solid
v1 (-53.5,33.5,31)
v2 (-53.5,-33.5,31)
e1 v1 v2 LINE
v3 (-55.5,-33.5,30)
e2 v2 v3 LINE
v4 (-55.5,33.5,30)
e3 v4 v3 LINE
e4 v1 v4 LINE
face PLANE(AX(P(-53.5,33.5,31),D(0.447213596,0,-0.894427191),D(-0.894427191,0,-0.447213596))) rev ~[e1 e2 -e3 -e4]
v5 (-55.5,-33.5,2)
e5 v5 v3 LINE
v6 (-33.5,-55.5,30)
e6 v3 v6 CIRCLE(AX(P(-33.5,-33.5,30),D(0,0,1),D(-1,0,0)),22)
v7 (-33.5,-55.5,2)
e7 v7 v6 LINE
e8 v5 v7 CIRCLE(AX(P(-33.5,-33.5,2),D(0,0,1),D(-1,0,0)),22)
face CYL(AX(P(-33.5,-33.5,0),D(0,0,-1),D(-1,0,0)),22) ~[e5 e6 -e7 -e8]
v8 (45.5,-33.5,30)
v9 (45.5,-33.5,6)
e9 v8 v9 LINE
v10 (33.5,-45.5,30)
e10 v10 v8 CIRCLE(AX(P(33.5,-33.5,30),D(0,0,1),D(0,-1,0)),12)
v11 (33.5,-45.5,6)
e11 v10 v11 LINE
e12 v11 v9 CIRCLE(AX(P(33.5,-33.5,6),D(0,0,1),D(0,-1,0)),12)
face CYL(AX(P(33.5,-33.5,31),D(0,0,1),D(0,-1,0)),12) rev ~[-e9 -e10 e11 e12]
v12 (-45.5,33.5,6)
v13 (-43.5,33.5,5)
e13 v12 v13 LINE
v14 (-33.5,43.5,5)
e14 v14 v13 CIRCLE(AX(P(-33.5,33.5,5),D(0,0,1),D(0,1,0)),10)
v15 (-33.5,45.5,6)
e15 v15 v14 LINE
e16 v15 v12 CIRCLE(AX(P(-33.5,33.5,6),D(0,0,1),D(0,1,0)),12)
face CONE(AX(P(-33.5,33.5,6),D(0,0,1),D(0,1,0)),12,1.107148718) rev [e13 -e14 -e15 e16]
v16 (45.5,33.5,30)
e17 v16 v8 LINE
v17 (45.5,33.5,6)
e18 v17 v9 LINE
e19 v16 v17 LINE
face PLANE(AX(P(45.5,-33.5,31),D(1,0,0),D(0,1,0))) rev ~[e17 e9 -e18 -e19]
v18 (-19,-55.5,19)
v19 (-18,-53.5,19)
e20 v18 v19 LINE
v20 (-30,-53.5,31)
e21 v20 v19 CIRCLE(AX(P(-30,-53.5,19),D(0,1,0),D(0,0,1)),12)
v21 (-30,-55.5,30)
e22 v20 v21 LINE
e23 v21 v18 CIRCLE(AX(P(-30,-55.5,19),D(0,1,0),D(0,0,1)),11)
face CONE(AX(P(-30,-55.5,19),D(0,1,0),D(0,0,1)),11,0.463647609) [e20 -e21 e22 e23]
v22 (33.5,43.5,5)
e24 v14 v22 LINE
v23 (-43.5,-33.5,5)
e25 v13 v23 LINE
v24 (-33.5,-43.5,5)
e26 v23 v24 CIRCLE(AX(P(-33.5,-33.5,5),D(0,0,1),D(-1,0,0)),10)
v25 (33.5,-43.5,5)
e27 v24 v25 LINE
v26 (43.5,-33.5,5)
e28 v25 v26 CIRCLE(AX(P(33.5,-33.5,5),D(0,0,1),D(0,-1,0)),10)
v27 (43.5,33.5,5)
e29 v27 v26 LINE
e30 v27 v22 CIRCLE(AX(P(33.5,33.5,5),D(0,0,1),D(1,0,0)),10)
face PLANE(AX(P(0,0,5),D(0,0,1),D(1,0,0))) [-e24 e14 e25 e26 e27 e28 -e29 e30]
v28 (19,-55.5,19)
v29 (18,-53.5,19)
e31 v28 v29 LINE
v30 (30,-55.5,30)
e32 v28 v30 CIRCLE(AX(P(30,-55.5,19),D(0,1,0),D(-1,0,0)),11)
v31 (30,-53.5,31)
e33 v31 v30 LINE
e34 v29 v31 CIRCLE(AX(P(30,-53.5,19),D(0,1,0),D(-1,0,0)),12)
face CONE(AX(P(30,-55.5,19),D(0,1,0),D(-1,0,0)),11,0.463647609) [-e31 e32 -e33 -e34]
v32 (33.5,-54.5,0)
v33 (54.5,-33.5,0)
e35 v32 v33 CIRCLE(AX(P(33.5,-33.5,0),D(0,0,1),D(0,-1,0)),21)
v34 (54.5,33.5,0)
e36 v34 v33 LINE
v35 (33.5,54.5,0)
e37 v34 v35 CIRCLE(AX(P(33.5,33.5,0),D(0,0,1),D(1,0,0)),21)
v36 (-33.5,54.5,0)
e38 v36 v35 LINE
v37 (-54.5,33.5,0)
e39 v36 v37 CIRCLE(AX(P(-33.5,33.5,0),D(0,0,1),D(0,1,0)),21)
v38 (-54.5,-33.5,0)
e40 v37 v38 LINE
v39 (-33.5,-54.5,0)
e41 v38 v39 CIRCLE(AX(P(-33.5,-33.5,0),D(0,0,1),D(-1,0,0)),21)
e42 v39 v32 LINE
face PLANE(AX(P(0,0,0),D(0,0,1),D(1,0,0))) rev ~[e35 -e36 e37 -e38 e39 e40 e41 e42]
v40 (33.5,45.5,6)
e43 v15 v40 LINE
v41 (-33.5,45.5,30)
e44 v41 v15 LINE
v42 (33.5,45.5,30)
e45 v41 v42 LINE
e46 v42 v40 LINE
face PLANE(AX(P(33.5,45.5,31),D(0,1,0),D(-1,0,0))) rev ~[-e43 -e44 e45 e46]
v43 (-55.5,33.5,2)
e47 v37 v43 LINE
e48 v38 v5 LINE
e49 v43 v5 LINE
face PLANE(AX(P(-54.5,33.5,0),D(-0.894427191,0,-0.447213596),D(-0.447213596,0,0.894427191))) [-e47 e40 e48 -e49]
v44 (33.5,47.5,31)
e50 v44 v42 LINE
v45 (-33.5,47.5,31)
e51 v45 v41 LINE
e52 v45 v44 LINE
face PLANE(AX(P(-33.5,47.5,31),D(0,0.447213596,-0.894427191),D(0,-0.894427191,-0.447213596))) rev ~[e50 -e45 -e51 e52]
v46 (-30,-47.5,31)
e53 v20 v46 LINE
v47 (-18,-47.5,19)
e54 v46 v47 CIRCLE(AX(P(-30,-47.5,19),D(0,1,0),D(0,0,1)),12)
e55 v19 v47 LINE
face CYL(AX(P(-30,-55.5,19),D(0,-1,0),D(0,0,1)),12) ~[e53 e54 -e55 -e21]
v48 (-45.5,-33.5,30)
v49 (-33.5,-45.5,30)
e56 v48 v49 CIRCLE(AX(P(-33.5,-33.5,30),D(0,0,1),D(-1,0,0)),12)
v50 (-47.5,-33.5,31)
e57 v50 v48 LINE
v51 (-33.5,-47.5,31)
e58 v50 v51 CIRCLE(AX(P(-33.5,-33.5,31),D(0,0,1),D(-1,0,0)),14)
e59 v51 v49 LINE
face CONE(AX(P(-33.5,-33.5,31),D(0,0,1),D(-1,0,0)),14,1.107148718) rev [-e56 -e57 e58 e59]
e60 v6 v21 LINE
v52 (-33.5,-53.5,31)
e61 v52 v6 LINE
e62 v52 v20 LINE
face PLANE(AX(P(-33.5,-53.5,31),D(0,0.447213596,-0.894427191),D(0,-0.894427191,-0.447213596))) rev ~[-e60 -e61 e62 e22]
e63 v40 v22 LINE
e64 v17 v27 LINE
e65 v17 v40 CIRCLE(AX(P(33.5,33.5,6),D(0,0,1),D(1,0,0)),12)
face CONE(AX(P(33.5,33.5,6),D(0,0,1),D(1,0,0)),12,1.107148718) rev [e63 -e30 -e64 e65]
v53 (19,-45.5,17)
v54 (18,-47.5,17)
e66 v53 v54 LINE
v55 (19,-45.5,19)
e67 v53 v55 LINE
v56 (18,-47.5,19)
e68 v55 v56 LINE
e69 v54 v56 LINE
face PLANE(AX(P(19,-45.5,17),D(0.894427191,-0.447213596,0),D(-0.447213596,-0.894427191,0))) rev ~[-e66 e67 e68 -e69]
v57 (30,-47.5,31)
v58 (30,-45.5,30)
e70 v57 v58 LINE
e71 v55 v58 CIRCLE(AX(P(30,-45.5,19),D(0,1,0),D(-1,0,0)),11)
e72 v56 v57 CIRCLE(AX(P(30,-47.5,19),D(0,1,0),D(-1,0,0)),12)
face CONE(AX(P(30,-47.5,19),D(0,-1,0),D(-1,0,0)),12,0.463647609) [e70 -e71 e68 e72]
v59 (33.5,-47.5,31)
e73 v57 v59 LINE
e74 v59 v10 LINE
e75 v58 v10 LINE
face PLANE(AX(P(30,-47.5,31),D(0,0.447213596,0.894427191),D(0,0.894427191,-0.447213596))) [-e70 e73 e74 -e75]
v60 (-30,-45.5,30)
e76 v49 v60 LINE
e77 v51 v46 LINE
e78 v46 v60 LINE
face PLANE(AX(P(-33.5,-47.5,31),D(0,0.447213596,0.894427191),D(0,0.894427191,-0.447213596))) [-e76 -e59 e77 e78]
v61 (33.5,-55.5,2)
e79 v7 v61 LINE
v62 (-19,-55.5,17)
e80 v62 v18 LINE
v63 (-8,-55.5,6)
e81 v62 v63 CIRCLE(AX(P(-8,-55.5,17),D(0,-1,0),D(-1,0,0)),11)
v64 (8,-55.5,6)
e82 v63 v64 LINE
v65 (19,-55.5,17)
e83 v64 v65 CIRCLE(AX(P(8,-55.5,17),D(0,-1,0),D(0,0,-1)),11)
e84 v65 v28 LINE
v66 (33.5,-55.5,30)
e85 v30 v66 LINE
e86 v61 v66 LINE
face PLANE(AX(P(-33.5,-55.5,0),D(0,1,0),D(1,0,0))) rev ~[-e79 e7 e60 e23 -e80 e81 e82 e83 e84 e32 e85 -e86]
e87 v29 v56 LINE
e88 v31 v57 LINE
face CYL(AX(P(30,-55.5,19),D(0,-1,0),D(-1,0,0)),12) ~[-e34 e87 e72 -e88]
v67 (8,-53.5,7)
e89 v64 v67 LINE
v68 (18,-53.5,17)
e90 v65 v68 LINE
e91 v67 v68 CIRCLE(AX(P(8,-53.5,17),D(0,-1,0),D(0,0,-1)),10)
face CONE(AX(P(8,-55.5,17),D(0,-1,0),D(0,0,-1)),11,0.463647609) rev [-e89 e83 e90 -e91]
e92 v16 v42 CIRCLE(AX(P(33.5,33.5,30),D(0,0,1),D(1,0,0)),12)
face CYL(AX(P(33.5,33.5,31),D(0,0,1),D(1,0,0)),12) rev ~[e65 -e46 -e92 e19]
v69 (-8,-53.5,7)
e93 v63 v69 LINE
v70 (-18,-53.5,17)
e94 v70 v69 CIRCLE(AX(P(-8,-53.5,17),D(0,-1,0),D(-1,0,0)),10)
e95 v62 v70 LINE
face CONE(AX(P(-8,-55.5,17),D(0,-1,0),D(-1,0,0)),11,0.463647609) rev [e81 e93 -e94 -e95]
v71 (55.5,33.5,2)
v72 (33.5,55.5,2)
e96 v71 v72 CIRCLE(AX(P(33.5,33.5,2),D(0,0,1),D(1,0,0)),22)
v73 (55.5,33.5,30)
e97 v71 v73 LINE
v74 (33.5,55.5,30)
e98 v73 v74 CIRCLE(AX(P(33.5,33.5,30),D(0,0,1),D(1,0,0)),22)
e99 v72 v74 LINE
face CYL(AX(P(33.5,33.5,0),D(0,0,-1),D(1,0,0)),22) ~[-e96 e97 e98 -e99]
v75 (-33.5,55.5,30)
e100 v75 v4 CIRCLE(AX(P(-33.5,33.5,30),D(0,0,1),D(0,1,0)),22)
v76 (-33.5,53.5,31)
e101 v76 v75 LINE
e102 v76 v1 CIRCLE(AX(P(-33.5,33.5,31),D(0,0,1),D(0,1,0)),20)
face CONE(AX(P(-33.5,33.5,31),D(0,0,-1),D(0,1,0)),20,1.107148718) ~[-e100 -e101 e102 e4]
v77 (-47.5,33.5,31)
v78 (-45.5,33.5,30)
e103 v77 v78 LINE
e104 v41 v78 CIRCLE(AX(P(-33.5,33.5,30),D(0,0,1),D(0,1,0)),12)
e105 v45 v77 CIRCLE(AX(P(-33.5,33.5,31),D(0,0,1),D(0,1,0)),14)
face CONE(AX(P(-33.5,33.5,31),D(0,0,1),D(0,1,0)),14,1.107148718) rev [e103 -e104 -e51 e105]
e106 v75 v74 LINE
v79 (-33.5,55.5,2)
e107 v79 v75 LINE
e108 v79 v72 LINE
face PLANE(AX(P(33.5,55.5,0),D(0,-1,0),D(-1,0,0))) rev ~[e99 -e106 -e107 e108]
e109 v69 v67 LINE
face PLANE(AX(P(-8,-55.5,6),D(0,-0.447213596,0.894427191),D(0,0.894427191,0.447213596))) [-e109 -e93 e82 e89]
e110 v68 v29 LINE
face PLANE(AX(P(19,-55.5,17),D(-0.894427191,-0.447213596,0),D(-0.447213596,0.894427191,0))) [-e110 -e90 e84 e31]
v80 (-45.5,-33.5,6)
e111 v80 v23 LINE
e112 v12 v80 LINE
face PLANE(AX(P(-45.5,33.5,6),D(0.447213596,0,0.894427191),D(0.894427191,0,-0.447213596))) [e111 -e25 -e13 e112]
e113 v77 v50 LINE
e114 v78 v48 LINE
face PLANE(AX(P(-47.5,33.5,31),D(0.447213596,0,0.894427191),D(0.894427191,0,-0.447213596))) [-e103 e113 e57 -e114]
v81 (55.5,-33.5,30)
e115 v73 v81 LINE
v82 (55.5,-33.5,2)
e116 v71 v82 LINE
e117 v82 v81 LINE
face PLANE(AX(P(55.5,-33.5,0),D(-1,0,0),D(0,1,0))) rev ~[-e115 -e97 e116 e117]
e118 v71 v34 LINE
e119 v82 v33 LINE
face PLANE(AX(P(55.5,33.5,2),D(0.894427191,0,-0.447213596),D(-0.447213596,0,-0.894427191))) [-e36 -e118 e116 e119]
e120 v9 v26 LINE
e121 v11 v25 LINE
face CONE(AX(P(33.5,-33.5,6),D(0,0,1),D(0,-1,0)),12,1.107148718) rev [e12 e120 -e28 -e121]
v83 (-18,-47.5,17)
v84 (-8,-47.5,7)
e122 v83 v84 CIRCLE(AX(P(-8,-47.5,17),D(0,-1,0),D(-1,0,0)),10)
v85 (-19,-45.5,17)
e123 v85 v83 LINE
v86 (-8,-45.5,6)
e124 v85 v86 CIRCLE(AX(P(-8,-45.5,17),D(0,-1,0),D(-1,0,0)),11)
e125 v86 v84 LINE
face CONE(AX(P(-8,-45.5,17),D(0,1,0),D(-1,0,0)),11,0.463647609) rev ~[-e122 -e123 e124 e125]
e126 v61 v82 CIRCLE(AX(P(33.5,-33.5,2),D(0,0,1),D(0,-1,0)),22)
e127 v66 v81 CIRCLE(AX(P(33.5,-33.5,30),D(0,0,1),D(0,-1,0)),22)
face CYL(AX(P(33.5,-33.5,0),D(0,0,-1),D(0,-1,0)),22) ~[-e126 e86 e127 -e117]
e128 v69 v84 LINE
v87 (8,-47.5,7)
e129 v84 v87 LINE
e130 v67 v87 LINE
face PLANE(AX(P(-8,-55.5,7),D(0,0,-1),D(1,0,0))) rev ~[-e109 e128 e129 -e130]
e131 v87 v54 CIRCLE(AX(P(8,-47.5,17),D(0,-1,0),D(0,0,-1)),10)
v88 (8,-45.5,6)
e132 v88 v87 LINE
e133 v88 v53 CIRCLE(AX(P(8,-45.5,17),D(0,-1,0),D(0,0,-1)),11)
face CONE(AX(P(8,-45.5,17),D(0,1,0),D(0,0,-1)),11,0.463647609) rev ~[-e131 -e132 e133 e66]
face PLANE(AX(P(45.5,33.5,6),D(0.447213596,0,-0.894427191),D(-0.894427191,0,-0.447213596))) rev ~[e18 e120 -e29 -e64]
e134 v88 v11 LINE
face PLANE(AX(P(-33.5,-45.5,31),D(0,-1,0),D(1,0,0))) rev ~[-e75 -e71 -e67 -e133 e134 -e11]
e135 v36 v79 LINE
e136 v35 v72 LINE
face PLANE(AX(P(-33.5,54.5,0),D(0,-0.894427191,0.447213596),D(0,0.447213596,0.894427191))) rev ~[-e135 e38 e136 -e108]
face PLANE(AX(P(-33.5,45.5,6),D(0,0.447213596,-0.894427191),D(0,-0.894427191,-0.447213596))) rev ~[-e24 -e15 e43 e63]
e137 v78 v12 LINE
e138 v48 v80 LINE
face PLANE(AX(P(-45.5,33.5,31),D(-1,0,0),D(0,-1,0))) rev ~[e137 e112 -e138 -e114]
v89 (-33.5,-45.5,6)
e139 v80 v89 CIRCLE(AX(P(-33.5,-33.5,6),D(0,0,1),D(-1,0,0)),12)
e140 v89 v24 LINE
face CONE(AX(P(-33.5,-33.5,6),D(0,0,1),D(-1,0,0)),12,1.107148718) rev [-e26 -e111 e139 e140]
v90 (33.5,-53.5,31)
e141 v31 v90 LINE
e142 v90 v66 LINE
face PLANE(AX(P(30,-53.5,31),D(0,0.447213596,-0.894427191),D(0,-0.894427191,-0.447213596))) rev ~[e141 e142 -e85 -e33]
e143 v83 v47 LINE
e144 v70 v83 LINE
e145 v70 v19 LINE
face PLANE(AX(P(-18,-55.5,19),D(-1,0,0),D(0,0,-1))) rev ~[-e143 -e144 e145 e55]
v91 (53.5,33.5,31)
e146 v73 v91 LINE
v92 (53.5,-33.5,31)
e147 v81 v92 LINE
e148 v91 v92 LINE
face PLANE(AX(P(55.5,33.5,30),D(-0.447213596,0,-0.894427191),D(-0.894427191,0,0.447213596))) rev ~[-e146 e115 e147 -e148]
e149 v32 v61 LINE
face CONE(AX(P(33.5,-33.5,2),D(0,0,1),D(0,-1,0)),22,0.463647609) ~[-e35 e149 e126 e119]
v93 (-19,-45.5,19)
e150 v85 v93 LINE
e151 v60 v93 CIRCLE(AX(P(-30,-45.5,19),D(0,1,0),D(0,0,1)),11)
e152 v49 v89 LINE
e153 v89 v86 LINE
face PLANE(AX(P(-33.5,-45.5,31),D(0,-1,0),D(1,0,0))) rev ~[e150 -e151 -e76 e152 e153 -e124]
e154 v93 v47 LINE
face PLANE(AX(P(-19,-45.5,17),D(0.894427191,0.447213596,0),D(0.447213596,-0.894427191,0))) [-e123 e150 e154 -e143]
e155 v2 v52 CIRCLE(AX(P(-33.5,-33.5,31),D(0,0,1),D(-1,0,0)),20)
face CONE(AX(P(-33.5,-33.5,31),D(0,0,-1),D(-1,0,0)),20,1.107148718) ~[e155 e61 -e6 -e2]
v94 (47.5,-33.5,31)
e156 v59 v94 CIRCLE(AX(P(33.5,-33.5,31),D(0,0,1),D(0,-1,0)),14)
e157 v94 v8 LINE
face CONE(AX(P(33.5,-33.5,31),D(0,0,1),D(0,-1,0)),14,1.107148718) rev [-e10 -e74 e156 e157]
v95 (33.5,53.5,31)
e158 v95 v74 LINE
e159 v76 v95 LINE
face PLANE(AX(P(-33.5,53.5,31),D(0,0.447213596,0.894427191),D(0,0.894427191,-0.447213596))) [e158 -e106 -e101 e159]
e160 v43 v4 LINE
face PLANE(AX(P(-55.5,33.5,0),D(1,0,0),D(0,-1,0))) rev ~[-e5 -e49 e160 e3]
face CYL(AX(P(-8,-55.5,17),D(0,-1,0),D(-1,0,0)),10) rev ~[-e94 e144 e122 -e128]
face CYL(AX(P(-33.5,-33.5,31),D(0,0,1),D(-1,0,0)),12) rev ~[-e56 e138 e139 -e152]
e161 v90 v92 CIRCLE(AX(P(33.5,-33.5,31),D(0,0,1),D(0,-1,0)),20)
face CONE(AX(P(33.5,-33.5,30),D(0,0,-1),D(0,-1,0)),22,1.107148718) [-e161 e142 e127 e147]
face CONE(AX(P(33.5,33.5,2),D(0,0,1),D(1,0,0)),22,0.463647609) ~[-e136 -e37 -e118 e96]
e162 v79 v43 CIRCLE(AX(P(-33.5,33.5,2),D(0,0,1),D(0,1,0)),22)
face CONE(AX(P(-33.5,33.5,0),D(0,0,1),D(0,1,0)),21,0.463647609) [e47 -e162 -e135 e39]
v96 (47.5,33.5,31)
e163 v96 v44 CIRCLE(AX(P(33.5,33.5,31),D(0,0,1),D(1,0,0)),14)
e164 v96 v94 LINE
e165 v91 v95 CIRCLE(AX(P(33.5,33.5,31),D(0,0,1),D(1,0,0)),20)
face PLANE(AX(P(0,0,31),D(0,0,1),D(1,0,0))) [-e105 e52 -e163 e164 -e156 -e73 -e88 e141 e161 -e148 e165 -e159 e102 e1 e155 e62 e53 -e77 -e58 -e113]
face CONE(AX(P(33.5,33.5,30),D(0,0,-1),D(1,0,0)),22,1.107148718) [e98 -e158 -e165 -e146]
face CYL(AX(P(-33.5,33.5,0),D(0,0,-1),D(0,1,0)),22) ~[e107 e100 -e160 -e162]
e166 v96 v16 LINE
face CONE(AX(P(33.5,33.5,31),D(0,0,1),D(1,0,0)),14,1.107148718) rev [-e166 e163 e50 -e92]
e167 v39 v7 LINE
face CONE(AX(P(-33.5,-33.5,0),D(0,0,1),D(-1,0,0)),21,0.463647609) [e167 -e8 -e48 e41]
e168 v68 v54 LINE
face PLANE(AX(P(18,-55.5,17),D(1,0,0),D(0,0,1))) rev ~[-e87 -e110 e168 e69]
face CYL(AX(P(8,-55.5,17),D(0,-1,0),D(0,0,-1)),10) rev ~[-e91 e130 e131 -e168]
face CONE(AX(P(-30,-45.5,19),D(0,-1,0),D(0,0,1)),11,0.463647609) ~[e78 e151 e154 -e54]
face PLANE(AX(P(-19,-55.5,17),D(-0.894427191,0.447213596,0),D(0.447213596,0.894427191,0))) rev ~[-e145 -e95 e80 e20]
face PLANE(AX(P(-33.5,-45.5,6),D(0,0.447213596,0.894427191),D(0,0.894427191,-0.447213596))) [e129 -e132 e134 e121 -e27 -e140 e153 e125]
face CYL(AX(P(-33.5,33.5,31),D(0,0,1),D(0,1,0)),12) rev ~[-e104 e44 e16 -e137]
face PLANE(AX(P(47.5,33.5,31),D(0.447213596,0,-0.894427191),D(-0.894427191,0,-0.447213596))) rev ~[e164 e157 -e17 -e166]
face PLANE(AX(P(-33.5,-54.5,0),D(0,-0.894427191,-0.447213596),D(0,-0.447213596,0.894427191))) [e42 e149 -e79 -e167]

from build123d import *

# Parameters (mm, degrees)
F1_DEPTH     = 31
F3_DEPTH     = 26
F5_DEPTH     = 10
F6_T1_DEPTH  = 67
F6_T3_DEPTH  = 67
F6_T6_ANGLE  = 90
F6_T8_ANGLE  = 90
F6_T10_ANGLE = 90
F6_T12_ANGLE = 90
F6_T13_DEPTH = 67
F6_T15_DEPTH = 67
F6_T17_DEPTH = 3.5
F6_T19_DEPTH = 3.5
F6_T21_DEPTH = 2
F6_T23_DEPTH = 16
F6_T26_ANGLE = 90
F6_T28_ANGLE = 90
F6_T30_ANGLE = 90
F6_T32_ANGLE = 90
F6_T34_ANGLE = 90
F6_T36_ANGLE = 90
F6_T38_ANGLE = 90
F6_T40_ANGLE = 90
F6_T42_ANGLE = 90
F6_T44_ANGLE = 90
F6_T46_ANGLE = 90
F6_T48_ANGLE = 90
F6_T50_ANGLE = 90
F6_T52_ANGLE = 90
F6_T54_ANGLE = 90
F6_T56_ANGLE = 90
F6_T58_ANGLE = 90
F6_T60_ANGLE = 90
F6_T62_ANGLE = 90
F6_T64_ANGLE = 90


# Not quite as in the source:
# - a fillet or chamfer that OpenCascade refuses, or shapes differently, is made with other operations: its cross-section is extruded or revolved along the edge and cut away or added


with BuildPart() as f1:
    # F0 (on Top) → F1 (new body)
    with BuildSketch(Plane.XY):
        with BuildLine():
            Line((55.5, -33.5), (55.5, 33.5))
            ThreePointArc((55.5, 33.5), (49.0563491861, 49.0563491861), (33.5, 55.5))
            Line((33.5, 55.5), (-33.5, 55.5))
            ThreePointArc((-33.5, 55.5), (-49.0563491861, 49.0563491861), (-55.5, 33.5))
            Line((-55.5, 33.5), (-55.5, -33.5))
            ThreePointArc((-55.5, -33.5), (-49.0563491861, -49.0563491861), (-33.5, -55.5))
            Line((-33.5, -55.5), (33.5, -55.5))
            ThreePointArc((33.5, -55.5), (49.0563491861, -49.0563491861), (55.5, -33.5))
        make_face()
    extrude(amount=F1_DEPTH)

    # F2 (on face) → F3 (cut, through all)
    with BuildSketch(Plane.XY.offset(31)):
        with BuildLine():
            Line((33.5, 45.5), (-33.5, 45.5))
            ThreePointArc((-33.5, 45.5), (-41.9852813742, 41.9852813742), (-45.5, 33.5))
            Line((-45.5, 33.5), (-45.5, -33.5))
            ThreePointArc((-45.5, -33.5), (-41.9852813742, -41.9852813742), (-33.5, -45.5))
            Line((-33.5, -45.5), (33.5, -45.5))
            ThreePointArc((33.5, -45.5), (41.9852813742, -41.9852813742), (45.5, -33.5))
            Line((45.5, -33.5), (45.5, 33.5))
            ThreePointArc((45.5, 33.5), (41.9852813742, 41.9852813742), (33.5, 45.5))
        make_face()
    extrude(amount=-F3_DEPTH, mode=Mode.SUBTRACT)

    # F4 (on face) → F5 (cut, through all)
    with BuildSketch(Plane.XZ.offset(55.5)):
        with BuildLine():
            ThreePointArc((-30, 31), (-21.5147186258, 27.4852813742), (-18, 19))
            Line((-18, 19), (-18, 17))
            ThreePointArc((-18, 17), (-15.0710678119, 9.9289321881), (-8, 7))
            Line((-8, 7), (8, 7))
            ThreePointArc((8, 7), (15.0710678119, 9.9289321881), (18, 17))
            Line((18, 17), (18, 19))
            ThreePointArc((18, 19), (21.5147186258, 27.4852813742), (30, 31))
            Line((30, 31), (-30, 31))
        make_face()
    extrude(amount=-F5_DEPTH, mode=Mode.SUBTRACT)

    # F6: chamfer of 2 x 1 on 48 edges, made by hand

    # F6_s2 → F6_t1 (join)
    with BuildSketch(Plane.XZ.offset(-33.5)):
        Polygon((-45.5, 6), (-43.5, 5), (-45.5, 5), align=None)
        Polygon((45.5, 6), (43.5, 5), (45.5, 5), align=None)
    extrude(amount=F6_T1_DEPTH)

    # F6_s4 → F6_t3 (join)
    with BuildSketch(Plane.YZ.offset(-33.5)):
        Polygon((-45.5, 6), (-43.5, 5), (-45.5, 5), align=None)
        Polygon((45.5, 6), (43.5, 5), (45.5, 5), align=None)
    extrude(amount=F6_T3_DEPTH)

    # F6_s5 → F6_t6 (revolve)
    with BuildSketch(Plane.YZ.offset(33.5)):
        Polygon((-45.5, 6), (-43.5, 5), (-45.5, 5), align=None)
    revolve(axis=Axis((33.5, -33.5, 5), (0, 0, 1)), revolution_arc=F6_T6_ANGLE)

    # F6_s7 → F6_t8 (revolve)
    with BuildSketch(Plane.XZ.offset(-33.5)):
        Polygon((45.5, 6), (43.5, 5), (45.5, 5), align=None)
    revolve(axis=Axis((33.5, 33.5, 5), (0, 0, 1)), revolution_arc=F6_T8_ANGLE)

    # F6_s9 → F6_t10 (revolve)
    with BuildSketch(Plane.YZ.offset(-33.5)):
        Polygon((45.5, 6), (43.5, 5), (45.5, 5), align=None)
    revolve(axis=Axis((-33.5, 33.5, 5), (0, 0, 1)), revolution_arc=F6_T10_ANGLE)

    # F6_s11 → F6_t12 (revolve)
    with BuildSketch(Plane.XZ.offset(33.5)):
        Polygon((-45.5, 6), (-43.5, 5), (-45.5, 5), align=None)
    revolve(axis=Axis((-33.5, -33.5, 5), (0, 0, 1)), revolution_arc=F6_T12_ANGLE)

    # F6_s14 → F6_t13 (cut)
    with BuildSketch(Plane.YZ.offset(-33.5)):
        Polygon((47.5, 31), (45.5, 30), (45.5, 31), align=None)
        Polygon((53.5, 31), (55.5, 30), (55.5, 31), align=None)
        Polygon((-54.5, 0), (-55.5, 2), (-55.5, 0), align=None)
        Polygon((54.5, 0), (55.5, 2), (55.5, 0), align=None)
    extrude(amount=F6_T13_DEPTH, mode=Mode.SUBTRACT)

    # F6_s16 → F6_t15 (cut)
    with BuildSketch(Plane.XZ.offset(-33.5)):
        Polygon((55.5, 2), (54.5, 0), (55.5, 0), align=None)
        Polygon((55.5, 30), (53.5, 31), (55.5, 31), align=None)
        Polygon((-54.5, 0), (-55.5, 2), (-55.5, 0), align=None)
        Polygon((47.5, 31), (45.5, 30), (45.5, 31), align=None)
        Polygon((-47.5, 31), (-45.5, 30), (-45.5, 31), align=None)
        Polygon((-53.5, 31), (-55.5, 30), (-55.5, 31), align=None)
    extrude(amount=F6_T15_DEPTH, mode=Mode.SUBTRACT)

    # F6_s18 → F6_t17 (cut)
    with BuildSketch(Plane.YZ.offset(30)):
        Polygon((-53.5, 31), (-55.5, 30), (-55.5, 31), align=None)
        Polygon((-47.5, 31), (-45.5, 30), (-45.5, 31), align=None)
    extrude(amount=F6_T17_DEPTH, mode=Mode.SUBTRACT)

    # F6_s20 → F6_t19 (cut)
    with BuildSketch(Plane.YZ.offset(-33.5)):
        Polygon((-47.5, 31), (-45.5, 30), (-45.5, 31), align=None)
        Polygon((-53.5, 31), (-55.5, 30), (-55.5, 31), align=None)
    extrude(amount=F6_T19_DEPTH, mode=Mode.SUBTRACT)

    # F6_s22 → F6_t21 (cut)
    with BuildSketch(Plane.XY.offset(17)):
        Polygon((19, -55.5), (18, -53.5), (18, -55.5), align=None)
        Polygon((-19, -55.5), (-18, -53.5), (-18, -55.5), align=None)
        Polygon((-19, -45.5), (-18, -47.5), (-18, -45.5), align=None)
        Polygon((19, -45.5), (18, -47.5), (18, -45.5), align=None)
    extrude(amount=F6_T21_DEPTH, mode=Mode.SUBTRACT)

    # F6_s24 → F6_t23 (cut)
    with BuildSketch(Plane.YZ.offset(-8)):
        Polygon((-55.5, 6), (-53.5, 7), (-55.5, 7), align=None)
        Polygon((-45.5, 6), (-47.5, 7), (-45.5, 7), align=None)
    extrude(amount=F6_T23_DEPTH, mode=Mode.SUBTRACT)

    # F6_s25 → F6_t26 (revolve, cut)
    with BuildSketch(Plane.YZ.offset(33.5)):
        Polygon((-55.5, 2), (-54.5, 0), (-55.5, 0), align=None)
    revolve(axis=Axis((33.5, -33.5, 0), (0, 0, 1)), revolution_arc=F6_T26_ANGLE, mode=Mode.SUBTRACT)

    # F6_s27 → F6_t28 (revolve, cut)
    with BuildSketch(Plane.YZ.offset(33.5)):
        Polygon((-55.5, 30), (-53.5, 31), (-55.5, 31), align=None)
    revolve(axis=Axis((33.5, -33.5, 31), (0, 0, 1)), revolution_arc=F6_T28_ANGLE, mode=Mode.SUBTRACT)

    # F6_s29 → F6_t30 (revolve, cut)
    with BuildSketch(Plane.XZ.offset(-33.5)):
        Polygon((55.5, 2), (54.5, 0), (55.5, 0), align=None)
    revolve(axis=Axis((33.5, 33.5, 0), (0, 0, 1)), revolution_arc=F6_T30_ANGLE, mode=Mode.SUBTRACT)

    # F6_s31 → F6_t32 (revolve, cut)
    with BuildSketch(Plane.XZ.offset(-33.5)):
        Polygon((55.5, 30), (53.5, 31), (55.5, 31), align=None)
    revolve(axis=Axis((33.5, 33.5, 31), (0, 0, 1)), revolution_arc=F6_T32_ANGLE, mode=Mode.SUBTRACT)

    # F6_s33 → F6_t34 (revolve, cut)
    with BuildSketch(Plane.YZ.offset(-33.5)):
        Polygon((54.5, 0), (55.5, 2), (55.5, 0), align=None)
    revolve(axis=Axis((-33.5, 33.5, 0), (0, 0, 1)), revolution_arc=F6_T34_ANGLE, mode=Mode.SUBTRACT)

    # F6_s35 → F6_t36 (revolve, cut)
    with BuildSketch(Plane.XZ.offset(33.5)):
        Polygon((-54.5, 0), (-55.5, 2), (-55.5, 0), align=None)
    revolve(axis=Axis((-33.5, -33.5, 0), (0, 0, 1)), revolution_arc=F6_T36_ANGLE, mode=Mode.SUBTRACT)

    # F6_s37 → F6_t38 (revolve, cut)
    with BuildSketch(Plane.YZ.offset(33.5)):
        Polygon((-47.5, 31), (-45.5, 30), (-45.5, 31), align=None)
    revolve(axis=Axis((33.5, -33.5, 31), (0, 0, 1)), revolution_arc=F6_T38_ANGLE, mode=Mode.SUBTRACT)

    # F6_s39 → F6_t40 (revolve, cut)
    with BuildSketch(Plane.XZ.offset(-33.5)):
        Polygon((47.5, 31), (45.5, 30), (45.5, 31), align=None)
    revolve(axis=Axis((33.5, 33.5, 31), (0, 0, 1)), revolution_arc=F6_T40_ANGLE, mode=Mode.SUBTRACT)

    # F6_s41 → F6_t42 (revolve, cut)
    with BuildSketch(Plane.YZ.offset(-33.5)):
        Polygon((47.5, 31), (45.5, 30), (45.5, 31), align=None)
    revolve(axis=Axis((-33.5, 33.5, 31), (0, 0, 1)), revolution_arc=F6_T42_ANGLE, mode=Mode.SUBTRACT)

    # F6_s43 → F6_t44 (revolve, cut)
    with BuildSketch(Plane.XZ.offset(33.5)):
        Polygon((-47.5, 31), (-45.5, 30), (-45.5, 31), align=None)
    revolve(axis=Axis((-33.5, -33.5, 31), (0, 0, 1)), revolution_arc=F6_T44_ANGLE, mode=Mode.SUBTRACT)

    # F6_s45 → F6_t46 (revolve, cut)
    with BuildSketch(Plane.XZ.offset(33.5)):
        Polygon((-53.5, 31), (-55.5, 30), (-55.5, 31), align=None)
    revolve(axis=Axis((-33.5, -33.5, 31), (0, 0, 1)), revolution_arc=F6_T46_ANGLE, mode=Mode.SUBTRACT)

    # F6_s47 → F6_t48 (revolve, cut)
    with BuildSketch(Plane.YZ.offset(-33.5)):
        Polygon((53.5, 31), (55.5, 30), (55.5, 31), align=None)
    revolve(axis=Axis((-33.5, 33.5, 31), (0, 0, 1)), revolution_arc=F6_T48_ANGLE, mode=Mode.SUBTRACT)

    # F6_s49 → F6_t50 (revolve, cut)
    with BuildSketch(Plane.XY.offset(19)):
        Polygon((19, -55.5), (18, -53.5), (18, -55.5), align=None)
    revolve(axis=Axis((30, -55.5, 19), (0, 1, 0)), revolution_arc=F6_T50_ANGLE, mode=Mode.SUBTRACT)

    # F6_s51 → F6_t52 (revolve, cut)
    with BuildSketch(Plane.YZ.offset(8)):
        Polygon((-55.5, 6), (-53.5, 7), (-55.5, 7), align=None)
    revolve(axis=Axis((8, -55.5, 17), (0, -1, 0)), revolution_arc=F6_T52_ANGLE, mode=Mode.SUBTRACT)

    # F6_s53 → F6_t54 (revolve, cut)
    with BuildSketch(Plane.XY.offset(17)):
        Polygon((-19, -55.5), (-18, -53.5), (-18, -55.5), align=None)
    revolve(axis=Axis((-8, -55.5, 17), (0, -1, 0)), revolution_arc=F6_T54_ANGLE, mode=Mode.SUBTRACT)

    # F6_s55 → F6_t56 (revolve, cut)
    with BuildSketch(Plane.YZ.offset(-30)):
        Polygon((-55.5, 30), (-53.5, 31), (-55.5, 31), align=None)
    revolve(axis=Axis((-30, -55.5, 19), (0, 1, 0)), revolution_arc=F6_T56_ANGLE, mode=Mode.SUBTRACT)

    # F6_s57 → F6_t58 (revolve, cut)
    with BuildSketch(Plane.XY.offset(19)):
        Polygon((18, -47.5), (19, -45.5), (18, -45.5), align=None)
    revolve(axis=Axis((30, -45.5, 19), (0, 1, 0)), revolution_arc=F6_T58_ANGLE, mode=Mode.SUBTRACT)

    # F6_s59 → F6_t60 (revolve, cut)
    with BuildSketch(Plane.YZ.offset(-30)):
        Polygon((-45.5, 30), (-47.5, 31), (-45.5, 31), align=None)
    revolve(axis=Axis((-30, -45.5, 19), (0, 1, 0)), revolution_arc=F6_T60_ANGLE, mode=Mode.SUBTRACT)

    # F6_s61 → F6_t62 (revolve, cut)
    with BuildSketch(Plane.XY.offset(17)):
        Polygon((-19, -45.5), (-18, -47.5), (-18, -45.5), align=None)
    revolve(axis=Axis((-8, -45.5, 17), (0, -1, 0)), revolution_arc=F6_T62_ANGLE, mode=Mode.SUBTRACT)

    # F6_s63 → F6_t64 (revolve, cut)
    with BuildSketch(Plane.YZ.offset(8)):
        Polygon((-45.5, 6), (-47.5, 7), (-45.5, 7), align=None)
    revolve(axis=Axis((8, -45.5, 17), (0, -1, 0)), revolution_arc=F6_T64_ANGLE, mode=Mode.SUBTRACT)


solid = f1.part
